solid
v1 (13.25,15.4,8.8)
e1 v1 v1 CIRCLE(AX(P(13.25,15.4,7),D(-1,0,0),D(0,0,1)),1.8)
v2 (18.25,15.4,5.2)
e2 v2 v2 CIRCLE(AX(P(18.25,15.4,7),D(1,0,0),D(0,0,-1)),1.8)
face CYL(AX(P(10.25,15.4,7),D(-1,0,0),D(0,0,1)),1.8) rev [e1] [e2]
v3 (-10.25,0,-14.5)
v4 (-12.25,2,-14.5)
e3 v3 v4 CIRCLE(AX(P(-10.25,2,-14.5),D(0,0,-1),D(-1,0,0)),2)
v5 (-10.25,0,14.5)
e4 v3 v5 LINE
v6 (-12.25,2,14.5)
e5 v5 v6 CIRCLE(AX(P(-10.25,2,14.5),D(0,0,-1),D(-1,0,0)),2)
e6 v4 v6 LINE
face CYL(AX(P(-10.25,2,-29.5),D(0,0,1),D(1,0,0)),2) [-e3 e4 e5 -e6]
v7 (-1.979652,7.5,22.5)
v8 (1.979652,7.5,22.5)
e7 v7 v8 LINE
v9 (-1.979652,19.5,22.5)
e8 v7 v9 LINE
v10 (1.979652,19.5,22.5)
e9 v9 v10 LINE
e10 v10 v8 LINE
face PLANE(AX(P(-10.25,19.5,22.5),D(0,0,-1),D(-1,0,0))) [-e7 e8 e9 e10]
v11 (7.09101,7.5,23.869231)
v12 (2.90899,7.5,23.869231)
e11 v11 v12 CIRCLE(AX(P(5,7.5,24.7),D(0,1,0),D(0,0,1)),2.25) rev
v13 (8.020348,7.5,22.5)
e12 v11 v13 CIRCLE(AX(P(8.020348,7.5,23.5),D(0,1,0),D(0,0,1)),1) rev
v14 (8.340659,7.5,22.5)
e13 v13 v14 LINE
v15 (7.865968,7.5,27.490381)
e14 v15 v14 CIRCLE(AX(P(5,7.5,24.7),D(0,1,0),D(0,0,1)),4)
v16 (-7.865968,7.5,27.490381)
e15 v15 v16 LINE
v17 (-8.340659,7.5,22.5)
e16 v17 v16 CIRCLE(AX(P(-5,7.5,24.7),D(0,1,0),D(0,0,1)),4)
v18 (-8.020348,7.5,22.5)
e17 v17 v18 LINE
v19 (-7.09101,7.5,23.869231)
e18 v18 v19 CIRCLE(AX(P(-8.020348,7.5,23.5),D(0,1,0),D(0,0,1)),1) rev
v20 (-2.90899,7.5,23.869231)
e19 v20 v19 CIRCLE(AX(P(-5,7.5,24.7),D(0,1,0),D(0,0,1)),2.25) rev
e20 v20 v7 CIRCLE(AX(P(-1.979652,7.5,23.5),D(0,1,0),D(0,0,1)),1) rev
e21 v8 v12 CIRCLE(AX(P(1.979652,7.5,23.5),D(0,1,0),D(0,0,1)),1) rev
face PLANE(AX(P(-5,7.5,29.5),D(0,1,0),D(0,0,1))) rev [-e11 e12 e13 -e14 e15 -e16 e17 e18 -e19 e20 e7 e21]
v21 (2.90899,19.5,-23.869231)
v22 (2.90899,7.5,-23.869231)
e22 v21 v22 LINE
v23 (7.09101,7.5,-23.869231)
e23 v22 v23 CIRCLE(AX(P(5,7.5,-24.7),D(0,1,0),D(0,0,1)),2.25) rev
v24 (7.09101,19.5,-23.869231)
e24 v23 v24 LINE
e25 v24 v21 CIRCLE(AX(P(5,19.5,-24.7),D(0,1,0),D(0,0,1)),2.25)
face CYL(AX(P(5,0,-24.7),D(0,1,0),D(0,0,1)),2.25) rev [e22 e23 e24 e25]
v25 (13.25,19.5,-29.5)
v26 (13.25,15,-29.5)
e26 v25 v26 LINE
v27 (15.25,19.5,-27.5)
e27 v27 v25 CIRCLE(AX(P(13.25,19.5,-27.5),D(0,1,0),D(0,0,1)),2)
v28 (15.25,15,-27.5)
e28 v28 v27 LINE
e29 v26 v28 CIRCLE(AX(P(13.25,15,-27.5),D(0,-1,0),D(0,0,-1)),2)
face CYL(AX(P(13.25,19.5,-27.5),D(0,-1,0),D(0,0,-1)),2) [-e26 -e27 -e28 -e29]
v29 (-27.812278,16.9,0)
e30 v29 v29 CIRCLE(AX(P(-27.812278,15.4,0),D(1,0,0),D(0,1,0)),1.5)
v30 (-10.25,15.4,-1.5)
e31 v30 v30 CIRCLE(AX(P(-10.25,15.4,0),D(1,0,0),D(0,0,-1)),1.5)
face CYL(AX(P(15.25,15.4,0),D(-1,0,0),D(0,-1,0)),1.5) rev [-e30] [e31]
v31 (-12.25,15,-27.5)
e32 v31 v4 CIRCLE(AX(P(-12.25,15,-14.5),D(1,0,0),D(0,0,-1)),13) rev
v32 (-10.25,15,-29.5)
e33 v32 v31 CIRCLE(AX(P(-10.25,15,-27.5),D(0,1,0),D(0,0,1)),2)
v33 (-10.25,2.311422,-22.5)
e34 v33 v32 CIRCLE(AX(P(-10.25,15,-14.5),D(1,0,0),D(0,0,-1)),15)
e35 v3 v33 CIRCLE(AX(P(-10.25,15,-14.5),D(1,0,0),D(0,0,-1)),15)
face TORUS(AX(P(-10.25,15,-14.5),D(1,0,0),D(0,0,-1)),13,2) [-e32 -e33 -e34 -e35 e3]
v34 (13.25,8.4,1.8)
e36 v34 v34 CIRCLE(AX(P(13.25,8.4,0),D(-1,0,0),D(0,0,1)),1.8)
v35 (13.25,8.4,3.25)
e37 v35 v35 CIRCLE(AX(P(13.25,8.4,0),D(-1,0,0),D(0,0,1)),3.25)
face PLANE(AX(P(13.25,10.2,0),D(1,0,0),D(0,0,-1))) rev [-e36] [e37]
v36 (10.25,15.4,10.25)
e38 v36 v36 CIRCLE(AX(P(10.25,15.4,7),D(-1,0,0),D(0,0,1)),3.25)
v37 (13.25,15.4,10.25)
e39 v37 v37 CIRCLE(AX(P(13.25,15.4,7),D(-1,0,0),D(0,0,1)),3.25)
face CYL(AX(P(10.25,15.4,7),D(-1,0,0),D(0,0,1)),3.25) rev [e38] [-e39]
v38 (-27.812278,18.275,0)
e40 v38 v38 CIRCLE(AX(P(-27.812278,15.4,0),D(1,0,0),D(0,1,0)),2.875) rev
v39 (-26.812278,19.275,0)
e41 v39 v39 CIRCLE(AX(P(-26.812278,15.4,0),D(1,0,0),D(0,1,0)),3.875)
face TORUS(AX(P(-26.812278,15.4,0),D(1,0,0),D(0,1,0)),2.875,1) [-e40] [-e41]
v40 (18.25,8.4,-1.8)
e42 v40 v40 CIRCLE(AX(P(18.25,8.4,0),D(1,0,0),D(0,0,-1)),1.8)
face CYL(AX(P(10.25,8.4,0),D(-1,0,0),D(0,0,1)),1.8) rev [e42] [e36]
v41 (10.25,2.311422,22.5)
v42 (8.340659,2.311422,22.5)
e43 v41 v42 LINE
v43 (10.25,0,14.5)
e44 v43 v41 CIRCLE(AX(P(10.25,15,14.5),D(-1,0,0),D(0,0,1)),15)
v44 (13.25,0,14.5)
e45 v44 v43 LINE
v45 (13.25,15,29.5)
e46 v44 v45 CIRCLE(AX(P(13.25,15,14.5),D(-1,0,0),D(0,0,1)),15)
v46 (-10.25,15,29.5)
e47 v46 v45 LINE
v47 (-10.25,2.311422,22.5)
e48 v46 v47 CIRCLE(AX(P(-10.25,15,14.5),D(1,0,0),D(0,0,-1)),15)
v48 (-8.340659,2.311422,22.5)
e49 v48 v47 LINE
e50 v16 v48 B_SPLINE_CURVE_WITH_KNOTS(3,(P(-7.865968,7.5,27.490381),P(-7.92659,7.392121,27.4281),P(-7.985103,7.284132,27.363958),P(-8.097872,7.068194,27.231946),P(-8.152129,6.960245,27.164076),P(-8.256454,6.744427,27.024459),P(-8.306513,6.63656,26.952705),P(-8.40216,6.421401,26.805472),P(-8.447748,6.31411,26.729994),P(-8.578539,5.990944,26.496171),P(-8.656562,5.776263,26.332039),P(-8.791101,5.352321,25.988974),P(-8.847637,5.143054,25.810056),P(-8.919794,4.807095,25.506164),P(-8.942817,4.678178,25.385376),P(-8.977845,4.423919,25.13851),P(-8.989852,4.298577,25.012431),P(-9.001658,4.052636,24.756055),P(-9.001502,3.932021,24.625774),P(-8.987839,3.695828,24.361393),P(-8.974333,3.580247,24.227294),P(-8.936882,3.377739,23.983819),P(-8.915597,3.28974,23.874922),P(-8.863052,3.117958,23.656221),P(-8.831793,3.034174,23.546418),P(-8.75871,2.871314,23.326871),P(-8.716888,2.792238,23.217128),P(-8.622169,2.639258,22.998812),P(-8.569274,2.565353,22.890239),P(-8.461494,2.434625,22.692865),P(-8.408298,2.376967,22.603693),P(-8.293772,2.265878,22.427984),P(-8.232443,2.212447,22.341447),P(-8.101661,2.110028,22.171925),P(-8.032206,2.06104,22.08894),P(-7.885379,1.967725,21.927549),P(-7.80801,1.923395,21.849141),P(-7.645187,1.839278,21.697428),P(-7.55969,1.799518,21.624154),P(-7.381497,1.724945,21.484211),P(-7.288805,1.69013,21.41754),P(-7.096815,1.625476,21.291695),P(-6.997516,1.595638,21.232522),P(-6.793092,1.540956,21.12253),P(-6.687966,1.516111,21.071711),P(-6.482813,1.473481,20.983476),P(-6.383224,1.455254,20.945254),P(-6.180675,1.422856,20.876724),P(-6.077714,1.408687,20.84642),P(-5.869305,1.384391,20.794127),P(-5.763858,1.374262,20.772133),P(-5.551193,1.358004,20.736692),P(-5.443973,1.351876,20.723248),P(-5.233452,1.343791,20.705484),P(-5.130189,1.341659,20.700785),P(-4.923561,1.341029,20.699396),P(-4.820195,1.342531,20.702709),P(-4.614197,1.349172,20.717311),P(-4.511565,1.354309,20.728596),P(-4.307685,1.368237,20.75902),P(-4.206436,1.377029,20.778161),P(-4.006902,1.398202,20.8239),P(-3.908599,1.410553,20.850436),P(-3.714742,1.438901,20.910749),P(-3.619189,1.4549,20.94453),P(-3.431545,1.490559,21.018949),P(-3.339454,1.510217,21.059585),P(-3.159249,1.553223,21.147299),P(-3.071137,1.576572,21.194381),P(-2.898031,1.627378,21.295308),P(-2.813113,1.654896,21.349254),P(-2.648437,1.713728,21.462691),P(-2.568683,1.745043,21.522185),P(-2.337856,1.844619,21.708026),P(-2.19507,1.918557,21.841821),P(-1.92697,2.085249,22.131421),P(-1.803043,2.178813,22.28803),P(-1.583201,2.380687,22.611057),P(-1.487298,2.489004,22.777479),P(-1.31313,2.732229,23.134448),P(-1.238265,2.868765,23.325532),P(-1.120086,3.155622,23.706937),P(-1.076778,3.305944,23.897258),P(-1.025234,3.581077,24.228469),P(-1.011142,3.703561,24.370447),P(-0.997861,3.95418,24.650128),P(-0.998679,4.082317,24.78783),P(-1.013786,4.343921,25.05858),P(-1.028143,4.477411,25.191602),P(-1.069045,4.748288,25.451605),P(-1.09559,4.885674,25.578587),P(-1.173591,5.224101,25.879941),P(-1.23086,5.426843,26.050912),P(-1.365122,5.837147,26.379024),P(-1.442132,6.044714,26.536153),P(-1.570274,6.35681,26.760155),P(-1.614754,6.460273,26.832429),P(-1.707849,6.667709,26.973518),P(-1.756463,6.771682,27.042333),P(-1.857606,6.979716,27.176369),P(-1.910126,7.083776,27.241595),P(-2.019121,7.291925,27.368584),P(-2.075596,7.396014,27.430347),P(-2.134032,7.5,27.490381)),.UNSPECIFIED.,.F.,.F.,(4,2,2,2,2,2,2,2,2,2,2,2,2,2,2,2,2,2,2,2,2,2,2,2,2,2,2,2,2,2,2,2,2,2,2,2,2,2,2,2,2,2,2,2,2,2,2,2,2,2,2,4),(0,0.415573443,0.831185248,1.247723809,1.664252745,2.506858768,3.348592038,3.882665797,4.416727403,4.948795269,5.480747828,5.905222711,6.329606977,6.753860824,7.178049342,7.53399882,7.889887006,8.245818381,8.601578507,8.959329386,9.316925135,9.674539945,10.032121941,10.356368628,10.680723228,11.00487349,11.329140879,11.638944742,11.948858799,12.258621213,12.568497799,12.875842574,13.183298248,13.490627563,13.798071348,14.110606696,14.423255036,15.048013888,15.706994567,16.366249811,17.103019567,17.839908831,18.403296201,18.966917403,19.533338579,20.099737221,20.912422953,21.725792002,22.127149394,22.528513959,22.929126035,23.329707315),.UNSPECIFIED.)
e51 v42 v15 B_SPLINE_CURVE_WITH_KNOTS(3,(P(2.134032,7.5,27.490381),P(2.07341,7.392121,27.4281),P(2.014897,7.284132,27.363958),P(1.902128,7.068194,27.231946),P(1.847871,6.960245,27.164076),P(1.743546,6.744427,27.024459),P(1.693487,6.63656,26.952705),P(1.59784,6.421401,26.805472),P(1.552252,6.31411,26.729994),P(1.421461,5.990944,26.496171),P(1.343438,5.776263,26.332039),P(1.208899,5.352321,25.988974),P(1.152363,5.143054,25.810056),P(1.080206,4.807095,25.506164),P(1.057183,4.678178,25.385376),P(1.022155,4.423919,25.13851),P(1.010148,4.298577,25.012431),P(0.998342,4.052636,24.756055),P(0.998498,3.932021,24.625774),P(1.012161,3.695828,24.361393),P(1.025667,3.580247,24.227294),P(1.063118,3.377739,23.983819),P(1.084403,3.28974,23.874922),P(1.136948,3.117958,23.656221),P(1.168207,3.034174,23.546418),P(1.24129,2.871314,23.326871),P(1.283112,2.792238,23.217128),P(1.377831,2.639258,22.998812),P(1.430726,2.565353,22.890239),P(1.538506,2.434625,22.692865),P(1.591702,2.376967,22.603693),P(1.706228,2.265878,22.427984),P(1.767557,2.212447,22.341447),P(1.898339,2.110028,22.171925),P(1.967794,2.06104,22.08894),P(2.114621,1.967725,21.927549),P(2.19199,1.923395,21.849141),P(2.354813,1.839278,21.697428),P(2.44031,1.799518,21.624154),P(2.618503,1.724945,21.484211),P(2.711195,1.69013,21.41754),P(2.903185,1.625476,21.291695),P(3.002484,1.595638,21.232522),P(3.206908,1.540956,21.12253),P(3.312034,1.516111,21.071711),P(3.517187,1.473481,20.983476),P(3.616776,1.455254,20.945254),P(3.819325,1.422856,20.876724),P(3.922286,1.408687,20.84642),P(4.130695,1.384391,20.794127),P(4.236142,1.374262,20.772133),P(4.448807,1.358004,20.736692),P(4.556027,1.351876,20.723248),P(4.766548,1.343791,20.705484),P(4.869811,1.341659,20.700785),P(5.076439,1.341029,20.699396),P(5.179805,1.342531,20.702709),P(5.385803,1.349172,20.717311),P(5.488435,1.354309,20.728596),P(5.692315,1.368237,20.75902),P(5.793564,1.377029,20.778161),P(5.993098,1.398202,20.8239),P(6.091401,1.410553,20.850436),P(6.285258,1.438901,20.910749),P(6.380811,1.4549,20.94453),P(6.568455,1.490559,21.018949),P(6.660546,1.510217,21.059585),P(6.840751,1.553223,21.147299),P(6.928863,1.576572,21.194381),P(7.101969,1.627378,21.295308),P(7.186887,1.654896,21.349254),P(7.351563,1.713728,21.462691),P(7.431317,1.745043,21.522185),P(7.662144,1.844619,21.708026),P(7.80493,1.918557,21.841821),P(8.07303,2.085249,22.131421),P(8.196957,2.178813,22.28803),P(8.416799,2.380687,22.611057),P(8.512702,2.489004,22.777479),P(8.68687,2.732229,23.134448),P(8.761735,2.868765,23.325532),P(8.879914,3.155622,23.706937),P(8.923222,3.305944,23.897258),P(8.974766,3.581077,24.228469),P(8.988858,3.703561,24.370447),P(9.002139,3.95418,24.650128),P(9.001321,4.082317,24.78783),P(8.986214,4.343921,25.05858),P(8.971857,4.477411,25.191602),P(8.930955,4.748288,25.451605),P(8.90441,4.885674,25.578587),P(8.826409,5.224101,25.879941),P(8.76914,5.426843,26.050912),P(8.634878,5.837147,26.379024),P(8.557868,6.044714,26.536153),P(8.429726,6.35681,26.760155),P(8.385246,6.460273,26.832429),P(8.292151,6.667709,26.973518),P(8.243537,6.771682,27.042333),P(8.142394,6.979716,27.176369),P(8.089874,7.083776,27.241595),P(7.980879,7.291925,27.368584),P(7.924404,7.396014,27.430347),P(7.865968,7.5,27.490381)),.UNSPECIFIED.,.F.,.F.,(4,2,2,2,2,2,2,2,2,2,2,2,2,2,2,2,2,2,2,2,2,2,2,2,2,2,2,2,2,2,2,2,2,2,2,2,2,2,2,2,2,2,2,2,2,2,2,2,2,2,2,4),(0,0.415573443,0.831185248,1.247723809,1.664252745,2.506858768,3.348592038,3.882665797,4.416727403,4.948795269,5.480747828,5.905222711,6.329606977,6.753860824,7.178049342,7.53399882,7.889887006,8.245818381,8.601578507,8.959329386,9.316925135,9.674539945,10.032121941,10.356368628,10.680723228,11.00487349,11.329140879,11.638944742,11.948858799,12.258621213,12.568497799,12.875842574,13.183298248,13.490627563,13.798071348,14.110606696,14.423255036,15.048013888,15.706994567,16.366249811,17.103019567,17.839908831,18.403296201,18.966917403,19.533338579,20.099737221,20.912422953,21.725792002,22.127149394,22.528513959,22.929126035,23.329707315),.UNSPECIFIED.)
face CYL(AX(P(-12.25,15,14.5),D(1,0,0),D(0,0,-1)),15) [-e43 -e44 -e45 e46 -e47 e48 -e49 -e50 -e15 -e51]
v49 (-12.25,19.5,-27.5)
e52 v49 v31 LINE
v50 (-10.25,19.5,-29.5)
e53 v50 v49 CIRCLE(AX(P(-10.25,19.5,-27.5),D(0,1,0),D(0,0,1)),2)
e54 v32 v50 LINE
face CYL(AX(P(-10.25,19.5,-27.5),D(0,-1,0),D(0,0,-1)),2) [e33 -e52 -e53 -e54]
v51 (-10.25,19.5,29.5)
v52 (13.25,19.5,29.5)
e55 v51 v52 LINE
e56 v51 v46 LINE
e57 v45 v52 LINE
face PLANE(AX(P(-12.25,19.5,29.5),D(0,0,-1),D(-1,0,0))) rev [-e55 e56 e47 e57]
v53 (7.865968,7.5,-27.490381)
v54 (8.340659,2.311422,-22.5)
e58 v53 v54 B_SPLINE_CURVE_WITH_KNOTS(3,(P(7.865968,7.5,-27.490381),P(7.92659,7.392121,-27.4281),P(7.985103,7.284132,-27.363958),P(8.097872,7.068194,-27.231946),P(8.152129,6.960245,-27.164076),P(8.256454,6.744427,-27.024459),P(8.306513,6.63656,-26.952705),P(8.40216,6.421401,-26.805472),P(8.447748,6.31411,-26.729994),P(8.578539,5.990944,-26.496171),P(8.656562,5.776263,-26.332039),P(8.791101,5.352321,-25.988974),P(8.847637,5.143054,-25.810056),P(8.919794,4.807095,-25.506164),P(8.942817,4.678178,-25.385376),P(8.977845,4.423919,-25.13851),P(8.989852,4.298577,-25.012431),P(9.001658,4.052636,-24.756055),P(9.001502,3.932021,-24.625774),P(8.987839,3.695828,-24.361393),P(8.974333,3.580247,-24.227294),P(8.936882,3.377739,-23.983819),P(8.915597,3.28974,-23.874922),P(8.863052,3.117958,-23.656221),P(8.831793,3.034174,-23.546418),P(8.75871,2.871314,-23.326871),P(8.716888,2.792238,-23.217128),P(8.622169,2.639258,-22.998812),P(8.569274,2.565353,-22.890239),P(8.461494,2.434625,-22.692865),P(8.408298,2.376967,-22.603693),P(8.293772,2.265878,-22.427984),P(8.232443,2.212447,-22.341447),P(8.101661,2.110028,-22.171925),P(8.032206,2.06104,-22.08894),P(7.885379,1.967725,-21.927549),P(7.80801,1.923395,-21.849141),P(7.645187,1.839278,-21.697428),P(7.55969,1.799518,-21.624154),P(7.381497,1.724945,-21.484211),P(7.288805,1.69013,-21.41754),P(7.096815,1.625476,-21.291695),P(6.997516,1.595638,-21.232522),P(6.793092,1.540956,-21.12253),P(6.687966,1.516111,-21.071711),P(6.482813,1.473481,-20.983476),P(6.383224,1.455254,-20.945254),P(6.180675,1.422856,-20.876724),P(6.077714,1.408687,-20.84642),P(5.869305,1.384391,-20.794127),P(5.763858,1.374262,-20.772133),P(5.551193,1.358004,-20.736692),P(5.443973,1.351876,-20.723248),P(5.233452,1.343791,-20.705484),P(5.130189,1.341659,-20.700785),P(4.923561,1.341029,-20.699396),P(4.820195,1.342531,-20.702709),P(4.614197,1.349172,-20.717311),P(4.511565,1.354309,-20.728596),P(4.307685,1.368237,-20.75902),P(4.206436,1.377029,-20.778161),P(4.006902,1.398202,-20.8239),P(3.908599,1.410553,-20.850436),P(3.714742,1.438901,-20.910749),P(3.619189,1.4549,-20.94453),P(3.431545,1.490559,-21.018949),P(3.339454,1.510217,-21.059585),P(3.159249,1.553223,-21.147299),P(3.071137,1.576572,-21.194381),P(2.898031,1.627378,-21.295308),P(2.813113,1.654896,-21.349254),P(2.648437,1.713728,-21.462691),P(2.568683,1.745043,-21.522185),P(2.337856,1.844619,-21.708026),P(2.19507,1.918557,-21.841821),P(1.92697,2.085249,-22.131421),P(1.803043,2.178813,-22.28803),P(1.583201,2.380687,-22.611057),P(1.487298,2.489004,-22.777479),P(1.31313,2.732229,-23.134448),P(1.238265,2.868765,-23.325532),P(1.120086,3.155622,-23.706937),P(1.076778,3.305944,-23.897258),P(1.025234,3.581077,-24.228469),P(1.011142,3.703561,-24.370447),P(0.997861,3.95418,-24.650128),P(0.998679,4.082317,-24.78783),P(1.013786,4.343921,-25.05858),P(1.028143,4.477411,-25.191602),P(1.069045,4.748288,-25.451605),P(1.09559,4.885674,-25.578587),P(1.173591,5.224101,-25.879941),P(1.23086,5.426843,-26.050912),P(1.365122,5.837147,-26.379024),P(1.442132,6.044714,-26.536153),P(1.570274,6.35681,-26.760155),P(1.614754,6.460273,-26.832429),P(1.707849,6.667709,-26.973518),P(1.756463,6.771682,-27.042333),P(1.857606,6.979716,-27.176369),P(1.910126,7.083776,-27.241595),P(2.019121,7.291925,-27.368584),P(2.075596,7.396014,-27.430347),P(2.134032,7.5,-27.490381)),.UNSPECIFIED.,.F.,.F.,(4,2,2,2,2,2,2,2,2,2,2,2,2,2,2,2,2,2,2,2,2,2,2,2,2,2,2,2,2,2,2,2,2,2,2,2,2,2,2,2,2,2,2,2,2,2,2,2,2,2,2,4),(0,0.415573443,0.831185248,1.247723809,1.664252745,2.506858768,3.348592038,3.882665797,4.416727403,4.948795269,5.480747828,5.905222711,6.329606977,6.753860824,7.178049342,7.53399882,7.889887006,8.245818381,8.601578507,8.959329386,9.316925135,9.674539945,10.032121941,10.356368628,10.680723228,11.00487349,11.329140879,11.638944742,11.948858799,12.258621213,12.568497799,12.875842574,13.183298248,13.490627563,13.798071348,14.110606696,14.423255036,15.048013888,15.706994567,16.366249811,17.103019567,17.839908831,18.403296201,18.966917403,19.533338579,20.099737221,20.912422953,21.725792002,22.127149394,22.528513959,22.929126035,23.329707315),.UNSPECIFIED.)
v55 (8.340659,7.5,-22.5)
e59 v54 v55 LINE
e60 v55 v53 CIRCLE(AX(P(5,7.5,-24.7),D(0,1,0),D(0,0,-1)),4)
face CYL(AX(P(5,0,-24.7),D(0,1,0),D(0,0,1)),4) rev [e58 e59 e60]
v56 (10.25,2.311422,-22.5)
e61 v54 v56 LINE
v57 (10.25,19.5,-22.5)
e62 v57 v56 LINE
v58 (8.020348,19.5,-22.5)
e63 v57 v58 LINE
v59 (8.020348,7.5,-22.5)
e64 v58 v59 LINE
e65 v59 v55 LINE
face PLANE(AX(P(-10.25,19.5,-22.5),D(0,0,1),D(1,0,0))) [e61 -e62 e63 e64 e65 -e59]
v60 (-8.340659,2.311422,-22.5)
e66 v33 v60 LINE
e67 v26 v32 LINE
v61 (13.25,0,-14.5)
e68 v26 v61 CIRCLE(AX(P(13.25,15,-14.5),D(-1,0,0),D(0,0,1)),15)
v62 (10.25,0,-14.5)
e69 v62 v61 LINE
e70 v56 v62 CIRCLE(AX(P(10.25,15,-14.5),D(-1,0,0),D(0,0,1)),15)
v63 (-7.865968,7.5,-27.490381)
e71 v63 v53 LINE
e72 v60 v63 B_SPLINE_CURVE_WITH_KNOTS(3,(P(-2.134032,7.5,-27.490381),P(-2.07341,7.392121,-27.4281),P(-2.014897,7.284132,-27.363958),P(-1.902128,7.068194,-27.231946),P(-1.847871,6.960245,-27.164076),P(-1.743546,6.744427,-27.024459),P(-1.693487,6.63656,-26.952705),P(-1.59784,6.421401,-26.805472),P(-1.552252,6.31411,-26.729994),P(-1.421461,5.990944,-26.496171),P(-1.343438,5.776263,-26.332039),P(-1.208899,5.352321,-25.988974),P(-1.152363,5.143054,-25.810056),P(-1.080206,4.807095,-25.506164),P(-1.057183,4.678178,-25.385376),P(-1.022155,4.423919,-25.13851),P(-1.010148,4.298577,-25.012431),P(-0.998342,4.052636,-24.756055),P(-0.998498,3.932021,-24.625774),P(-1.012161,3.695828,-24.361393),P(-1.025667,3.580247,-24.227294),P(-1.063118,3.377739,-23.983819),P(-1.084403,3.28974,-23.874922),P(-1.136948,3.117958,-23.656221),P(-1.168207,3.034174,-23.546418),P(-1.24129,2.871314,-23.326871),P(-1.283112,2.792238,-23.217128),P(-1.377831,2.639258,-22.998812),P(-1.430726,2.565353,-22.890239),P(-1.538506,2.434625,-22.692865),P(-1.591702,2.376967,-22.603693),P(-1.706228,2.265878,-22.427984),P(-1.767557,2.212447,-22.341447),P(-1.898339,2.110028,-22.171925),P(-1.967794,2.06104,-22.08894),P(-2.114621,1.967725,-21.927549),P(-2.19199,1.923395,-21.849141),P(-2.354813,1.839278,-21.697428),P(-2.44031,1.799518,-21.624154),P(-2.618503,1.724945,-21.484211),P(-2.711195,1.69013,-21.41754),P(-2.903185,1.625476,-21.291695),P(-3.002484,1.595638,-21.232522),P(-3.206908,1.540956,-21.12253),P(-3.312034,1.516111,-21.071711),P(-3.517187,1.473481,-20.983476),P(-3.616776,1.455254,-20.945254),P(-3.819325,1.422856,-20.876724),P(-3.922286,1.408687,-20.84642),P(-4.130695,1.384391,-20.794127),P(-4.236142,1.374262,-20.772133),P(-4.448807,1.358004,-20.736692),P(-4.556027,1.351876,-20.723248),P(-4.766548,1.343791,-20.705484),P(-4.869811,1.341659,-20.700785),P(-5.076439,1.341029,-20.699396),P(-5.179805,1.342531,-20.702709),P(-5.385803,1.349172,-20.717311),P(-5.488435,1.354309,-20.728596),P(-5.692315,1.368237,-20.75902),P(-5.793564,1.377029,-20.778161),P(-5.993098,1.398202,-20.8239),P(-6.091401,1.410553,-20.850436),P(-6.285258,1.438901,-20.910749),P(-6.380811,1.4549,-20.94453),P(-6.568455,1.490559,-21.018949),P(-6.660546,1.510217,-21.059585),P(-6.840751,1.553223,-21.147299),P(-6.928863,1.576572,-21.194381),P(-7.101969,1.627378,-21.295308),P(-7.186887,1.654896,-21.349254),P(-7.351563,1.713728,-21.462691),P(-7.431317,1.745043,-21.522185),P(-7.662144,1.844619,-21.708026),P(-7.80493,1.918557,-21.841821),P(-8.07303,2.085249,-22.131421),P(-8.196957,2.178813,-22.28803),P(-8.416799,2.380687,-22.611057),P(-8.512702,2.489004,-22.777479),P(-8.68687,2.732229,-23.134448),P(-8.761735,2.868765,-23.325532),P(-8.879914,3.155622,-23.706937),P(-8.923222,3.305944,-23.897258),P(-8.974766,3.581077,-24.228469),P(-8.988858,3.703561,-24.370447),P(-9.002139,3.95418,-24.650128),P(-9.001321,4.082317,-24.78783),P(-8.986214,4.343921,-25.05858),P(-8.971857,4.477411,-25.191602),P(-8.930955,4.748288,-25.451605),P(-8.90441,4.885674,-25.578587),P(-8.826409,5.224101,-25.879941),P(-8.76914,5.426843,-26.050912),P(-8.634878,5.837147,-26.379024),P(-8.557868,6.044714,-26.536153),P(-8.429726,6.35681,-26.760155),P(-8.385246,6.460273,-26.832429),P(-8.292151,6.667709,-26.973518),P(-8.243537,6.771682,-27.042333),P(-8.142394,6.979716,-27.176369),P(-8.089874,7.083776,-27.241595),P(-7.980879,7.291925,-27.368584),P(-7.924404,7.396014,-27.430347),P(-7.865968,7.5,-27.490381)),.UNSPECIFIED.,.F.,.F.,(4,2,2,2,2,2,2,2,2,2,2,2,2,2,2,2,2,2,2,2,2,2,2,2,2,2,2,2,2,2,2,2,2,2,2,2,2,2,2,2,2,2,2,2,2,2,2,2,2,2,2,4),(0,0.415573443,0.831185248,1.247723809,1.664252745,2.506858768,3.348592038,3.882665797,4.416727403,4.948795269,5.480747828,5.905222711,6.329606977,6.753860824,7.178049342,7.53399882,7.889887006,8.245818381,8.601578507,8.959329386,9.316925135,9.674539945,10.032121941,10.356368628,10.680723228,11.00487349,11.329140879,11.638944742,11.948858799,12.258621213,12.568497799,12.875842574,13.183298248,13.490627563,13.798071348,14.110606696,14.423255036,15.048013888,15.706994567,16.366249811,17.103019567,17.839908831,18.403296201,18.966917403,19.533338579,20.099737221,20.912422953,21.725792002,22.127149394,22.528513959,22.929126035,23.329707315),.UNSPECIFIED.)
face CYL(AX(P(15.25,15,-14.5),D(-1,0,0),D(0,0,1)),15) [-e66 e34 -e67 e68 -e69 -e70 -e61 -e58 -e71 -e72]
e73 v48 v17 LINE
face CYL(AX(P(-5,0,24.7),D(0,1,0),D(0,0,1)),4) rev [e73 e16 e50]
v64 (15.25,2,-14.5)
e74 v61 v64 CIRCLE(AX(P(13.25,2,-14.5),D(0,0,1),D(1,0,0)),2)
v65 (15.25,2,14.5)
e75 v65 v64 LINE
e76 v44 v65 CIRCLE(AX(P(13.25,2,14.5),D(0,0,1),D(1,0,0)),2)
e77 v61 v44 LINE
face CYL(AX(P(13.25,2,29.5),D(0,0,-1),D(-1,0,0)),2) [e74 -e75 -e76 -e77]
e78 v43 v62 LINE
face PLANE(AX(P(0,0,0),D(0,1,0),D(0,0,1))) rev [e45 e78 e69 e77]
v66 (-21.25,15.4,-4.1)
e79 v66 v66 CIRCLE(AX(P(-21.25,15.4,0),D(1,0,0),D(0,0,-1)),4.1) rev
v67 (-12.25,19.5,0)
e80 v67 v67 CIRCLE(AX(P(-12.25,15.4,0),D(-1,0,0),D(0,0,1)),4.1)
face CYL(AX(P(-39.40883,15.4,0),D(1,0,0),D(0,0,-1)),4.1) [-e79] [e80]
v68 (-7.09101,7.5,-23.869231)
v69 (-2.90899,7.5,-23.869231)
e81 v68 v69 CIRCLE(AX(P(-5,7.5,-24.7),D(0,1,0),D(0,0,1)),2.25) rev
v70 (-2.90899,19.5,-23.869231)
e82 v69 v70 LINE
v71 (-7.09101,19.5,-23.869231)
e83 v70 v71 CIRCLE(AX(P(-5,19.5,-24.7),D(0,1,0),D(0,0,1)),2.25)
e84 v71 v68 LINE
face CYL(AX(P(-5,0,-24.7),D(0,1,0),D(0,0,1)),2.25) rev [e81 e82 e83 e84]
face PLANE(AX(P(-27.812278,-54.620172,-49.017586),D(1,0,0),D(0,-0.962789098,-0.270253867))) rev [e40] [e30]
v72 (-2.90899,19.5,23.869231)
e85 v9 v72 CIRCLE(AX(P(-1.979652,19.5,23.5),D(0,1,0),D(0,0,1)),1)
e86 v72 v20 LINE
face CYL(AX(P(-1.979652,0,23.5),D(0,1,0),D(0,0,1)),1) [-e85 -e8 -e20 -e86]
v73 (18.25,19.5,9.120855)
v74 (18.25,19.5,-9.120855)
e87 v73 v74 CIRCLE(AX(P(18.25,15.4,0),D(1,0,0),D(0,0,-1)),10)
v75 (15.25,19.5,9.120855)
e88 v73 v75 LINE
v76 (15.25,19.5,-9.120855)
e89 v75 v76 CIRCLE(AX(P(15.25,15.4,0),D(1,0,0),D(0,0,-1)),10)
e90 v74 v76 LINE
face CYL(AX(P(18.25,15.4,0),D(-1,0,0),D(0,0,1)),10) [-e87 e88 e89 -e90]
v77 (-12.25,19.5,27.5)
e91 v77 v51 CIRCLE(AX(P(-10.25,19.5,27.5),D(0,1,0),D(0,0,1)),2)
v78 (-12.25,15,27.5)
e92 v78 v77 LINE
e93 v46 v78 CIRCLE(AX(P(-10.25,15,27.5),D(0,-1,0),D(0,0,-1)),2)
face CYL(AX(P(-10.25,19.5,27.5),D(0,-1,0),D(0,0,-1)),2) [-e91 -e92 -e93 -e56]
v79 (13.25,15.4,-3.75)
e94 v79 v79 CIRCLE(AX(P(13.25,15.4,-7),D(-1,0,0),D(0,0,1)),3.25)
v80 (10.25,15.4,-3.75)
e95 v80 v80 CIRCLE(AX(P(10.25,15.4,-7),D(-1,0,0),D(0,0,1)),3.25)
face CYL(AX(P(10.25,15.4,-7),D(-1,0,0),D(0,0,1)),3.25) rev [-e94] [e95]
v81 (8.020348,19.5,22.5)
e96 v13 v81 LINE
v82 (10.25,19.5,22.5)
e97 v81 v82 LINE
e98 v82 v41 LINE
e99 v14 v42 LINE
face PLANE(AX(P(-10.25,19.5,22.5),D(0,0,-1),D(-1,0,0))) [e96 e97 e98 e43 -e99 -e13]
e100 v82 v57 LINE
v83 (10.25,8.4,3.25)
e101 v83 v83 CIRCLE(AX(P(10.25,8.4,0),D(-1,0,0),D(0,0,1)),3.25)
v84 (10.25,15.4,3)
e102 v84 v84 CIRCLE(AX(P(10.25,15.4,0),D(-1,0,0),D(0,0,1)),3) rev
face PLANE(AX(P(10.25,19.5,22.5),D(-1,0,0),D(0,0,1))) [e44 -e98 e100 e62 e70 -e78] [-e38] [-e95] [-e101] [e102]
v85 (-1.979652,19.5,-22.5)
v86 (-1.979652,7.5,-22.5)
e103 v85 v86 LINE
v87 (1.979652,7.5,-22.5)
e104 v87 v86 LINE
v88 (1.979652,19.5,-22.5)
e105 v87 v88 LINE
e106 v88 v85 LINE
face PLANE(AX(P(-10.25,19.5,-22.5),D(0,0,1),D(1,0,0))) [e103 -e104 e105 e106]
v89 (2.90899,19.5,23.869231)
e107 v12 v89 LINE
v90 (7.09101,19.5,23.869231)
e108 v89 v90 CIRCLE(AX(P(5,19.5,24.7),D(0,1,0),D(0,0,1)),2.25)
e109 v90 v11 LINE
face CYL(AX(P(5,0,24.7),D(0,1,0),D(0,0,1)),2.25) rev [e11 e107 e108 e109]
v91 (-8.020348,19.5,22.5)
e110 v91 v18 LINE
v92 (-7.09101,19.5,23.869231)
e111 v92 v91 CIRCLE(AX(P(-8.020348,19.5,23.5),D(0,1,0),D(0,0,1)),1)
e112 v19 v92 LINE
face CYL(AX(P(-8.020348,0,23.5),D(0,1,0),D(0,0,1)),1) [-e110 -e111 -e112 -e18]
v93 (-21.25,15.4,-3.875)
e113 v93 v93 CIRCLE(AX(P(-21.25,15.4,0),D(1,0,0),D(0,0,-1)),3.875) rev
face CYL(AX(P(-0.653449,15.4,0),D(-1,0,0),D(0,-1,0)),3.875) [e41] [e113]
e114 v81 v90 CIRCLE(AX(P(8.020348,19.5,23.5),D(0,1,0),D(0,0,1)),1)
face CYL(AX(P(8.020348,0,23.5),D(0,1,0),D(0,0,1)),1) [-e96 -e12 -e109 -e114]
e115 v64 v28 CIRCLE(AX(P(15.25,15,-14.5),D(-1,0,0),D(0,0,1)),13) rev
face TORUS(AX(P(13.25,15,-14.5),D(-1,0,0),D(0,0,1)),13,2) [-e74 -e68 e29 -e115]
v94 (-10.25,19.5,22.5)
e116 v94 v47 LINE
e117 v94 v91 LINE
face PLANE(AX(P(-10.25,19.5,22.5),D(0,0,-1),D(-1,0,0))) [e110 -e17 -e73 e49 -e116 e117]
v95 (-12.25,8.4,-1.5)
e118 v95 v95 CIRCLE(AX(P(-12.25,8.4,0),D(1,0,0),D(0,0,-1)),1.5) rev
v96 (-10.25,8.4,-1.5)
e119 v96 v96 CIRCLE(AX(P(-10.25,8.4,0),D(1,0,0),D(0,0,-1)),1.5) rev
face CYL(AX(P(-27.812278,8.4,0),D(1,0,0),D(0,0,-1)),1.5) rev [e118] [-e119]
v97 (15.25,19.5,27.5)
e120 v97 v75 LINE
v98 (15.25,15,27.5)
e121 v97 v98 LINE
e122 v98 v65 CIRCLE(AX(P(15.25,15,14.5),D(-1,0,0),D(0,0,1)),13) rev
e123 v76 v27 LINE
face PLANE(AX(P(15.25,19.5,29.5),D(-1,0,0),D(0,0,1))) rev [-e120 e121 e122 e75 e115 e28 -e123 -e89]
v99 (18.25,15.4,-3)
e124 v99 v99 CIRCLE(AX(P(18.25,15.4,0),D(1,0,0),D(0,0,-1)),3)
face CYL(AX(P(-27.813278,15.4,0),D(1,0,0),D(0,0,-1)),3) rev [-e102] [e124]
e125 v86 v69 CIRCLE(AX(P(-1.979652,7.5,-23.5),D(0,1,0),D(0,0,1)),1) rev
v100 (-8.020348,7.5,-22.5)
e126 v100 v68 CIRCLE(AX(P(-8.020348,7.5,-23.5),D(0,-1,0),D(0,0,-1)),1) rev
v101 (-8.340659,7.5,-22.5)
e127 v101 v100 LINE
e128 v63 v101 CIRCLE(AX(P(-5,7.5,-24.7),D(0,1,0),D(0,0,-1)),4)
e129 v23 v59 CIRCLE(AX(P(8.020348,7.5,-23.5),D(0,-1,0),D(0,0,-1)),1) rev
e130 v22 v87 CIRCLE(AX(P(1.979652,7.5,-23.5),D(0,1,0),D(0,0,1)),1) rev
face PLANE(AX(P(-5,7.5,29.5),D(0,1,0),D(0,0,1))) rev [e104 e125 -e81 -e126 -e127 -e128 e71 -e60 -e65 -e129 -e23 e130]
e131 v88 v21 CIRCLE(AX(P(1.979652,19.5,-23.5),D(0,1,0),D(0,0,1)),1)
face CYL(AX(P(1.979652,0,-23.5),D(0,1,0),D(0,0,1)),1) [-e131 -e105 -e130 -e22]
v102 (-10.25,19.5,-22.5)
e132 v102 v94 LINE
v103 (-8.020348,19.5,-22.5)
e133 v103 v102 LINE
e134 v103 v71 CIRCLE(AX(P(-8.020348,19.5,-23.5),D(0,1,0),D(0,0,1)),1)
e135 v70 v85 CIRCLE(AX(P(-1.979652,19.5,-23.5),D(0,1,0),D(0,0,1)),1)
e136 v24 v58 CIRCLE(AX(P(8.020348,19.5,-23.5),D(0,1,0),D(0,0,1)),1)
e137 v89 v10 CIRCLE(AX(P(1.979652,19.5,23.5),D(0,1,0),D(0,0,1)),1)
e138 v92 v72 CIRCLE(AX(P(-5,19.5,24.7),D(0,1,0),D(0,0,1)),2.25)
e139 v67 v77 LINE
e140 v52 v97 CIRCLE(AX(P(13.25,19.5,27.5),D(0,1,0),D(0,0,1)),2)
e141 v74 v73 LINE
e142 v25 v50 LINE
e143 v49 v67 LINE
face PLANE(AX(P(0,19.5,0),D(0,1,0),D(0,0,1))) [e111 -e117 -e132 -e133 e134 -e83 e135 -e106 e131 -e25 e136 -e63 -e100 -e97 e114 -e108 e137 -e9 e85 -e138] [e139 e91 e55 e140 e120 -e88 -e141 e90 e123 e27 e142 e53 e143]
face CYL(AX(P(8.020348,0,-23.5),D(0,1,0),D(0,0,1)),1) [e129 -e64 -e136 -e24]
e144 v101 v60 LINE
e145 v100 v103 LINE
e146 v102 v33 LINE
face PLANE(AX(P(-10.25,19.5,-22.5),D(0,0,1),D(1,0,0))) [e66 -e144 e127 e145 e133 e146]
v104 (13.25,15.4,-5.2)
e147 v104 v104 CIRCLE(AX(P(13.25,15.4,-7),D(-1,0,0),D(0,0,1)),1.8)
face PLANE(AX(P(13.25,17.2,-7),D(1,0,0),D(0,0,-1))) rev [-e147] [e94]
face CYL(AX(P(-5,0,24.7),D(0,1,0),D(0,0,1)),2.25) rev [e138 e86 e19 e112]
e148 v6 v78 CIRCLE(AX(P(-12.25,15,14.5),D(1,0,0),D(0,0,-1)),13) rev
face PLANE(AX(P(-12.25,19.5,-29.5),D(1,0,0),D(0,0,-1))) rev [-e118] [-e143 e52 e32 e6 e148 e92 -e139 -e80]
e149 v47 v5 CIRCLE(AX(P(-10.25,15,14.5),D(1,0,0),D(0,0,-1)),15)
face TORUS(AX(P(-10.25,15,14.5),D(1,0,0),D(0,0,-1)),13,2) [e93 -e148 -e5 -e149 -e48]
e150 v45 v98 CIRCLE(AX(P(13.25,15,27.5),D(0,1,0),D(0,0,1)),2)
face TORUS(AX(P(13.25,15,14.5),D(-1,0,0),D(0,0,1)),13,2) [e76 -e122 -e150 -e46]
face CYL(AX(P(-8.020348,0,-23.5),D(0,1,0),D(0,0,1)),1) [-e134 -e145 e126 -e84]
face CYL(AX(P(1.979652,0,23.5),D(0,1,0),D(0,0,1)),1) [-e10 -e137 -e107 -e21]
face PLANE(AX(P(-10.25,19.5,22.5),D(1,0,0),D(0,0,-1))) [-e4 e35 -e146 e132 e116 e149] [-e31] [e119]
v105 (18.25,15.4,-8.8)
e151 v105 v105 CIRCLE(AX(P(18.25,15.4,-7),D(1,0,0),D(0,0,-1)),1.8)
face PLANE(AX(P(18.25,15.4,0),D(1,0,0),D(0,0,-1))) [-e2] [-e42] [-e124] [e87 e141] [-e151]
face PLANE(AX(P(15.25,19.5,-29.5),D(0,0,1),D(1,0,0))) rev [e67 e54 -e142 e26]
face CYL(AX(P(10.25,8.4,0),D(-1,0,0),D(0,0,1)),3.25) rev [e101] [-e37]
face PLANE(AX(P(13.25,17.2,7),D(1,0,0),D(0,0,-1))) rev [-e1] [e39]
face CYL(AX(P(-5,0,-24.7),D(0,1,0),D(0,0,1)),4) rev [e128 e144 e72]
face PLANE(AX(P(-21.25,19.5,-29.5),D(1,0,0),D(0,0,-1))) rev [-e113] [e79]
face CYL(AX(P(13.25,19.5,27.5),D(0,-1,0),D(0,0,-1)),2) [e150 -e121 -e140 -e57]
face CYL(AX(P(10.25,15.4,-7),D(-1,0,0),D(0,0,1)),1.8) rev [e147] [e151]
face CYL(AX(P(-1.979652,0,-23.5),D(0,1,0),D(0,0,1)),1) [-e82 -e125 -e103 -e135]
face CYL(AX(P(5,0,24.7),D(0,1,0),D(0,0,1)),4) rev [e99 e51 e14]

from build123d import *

# Parameters (mm, degrees)
SKETCH1_W                      = 27.5
SKETCH1_H                      = 59
SKETCH1_W_2                    = 20.5
SKETCH1_H_2                    = 45
BOSS_EXTRUDE1_DEPTH            = 19.5
CUT_EXTRUDE1_DEPTH             = 39.510550502
CUT_EXTRUDE1_DEPTH_BACK        = 39.510550502
SKETCH2_R                      = 2.25
FILLET1_R                      = 1
SKETCH4_R                      = 4.1
BOSS_EXTRUDE2_DEPTH            = 15.562278481
CBORE_FOR_M3_SHCS1_D           = 3.6
CBORE_FOR_M3_SHCS1_DEPTH       = 5
CBORE_FOR_M3_SHCS1_CBORE_D     = 6.5
CBORE_FOR_M3_SHCS1_CBORE_DEPTH = 3
CUT_EXTRUDE3_REACH             = 57.721
SKETCH5_R                      = 3
CUT_EXTRUDE11_START            = -6.562278481
SKETCH18_R                     = 4.1
SKETCH18_R_2                   = 3.875
CUT_EXTRUDE11_DEPTH            = 6.562278481
CUT_EXTRUDE12_DEPTH            = 56.721269081
CUT_EXTRUDE12_DEPTH_BACK       = 56.721269081
SKETCH20_R                     = 1.5
FILLET10_R                     = 1
CUT_EXTRUDE13_DEPTH            = 69.079165975
CUT_EXTRUDE13_DEPTH_BACK       = 69.079165975
SKETCH21_W                     = 10
SKETCH21_H                     = 15
FILLET8_R                      = 15
CUT_EXTRUDE2_START             = -12
SKETCH3_R                      = 4
CUT_EXTRUDE2_DEPTH             = 33.989141464
FILLET11_R                     = 2
BOSS_EXTRUDE3_START            = 3
SKETCH22_R                     = 1.8
SKETCH22_R_2                   = 3
BOSS_EXTRUDE3_DEPTH            = 3
SKETCH23_R                     = 1.5
CUT_EXTRUDE14_DEPTH            = 52.954182283


# Some blends are built 0.0001 mm under size
with BuildPart() as part:
    # Sketch1 → Boss-Extrude1 (new body)
    with BuildSketch(Plane(origin=(0, 0, 0), x_dir=(1, 0, 0), z_dir=(0, 1, 0))):
        with Locations((1.5, 0)):
            Rectangle(SKETCH1_W, SKETCH1_H)
        Rectangle(SKETCH1_W_2, SKETCH1_H_2, mode=Mode.SUBTRACT)
    extrude(amount=BOSS_EXTRUDE1_DEPTH)

    # Sketch2 → Cut-Extrude1 (cut, two sides: drawn at the far end of the back side and taken through both)
    with BuildSketch(Plane(origin=(0, 19.5, 0), x_dir=(1, 0, 0), z_dir=(0, 1, 0)).offset(-CUT_EXTRUDE1_DEPTH_BACK)):
        with Locations((-5, 24.7)):
            Circle(SKETCH2_R)
        with Locations((5, 24.7)):
            Circle(SKETCH2_R)
        with Locations((5, -24.7)):
            Circle(SKETCH2_R)
        with Locations((-5, -24.7)):
            Circle(SKETCH2_R)
    extrude(amount=CUT_EXTRUDE1_DEPTH + CUT_EXTRUDE1_DEPTH_BACK, mode=Mode.SUBTRACT)

    # Fillet1
    fillet1_edges = [part.edges().sort_by_distance(p)[0] for p in [
        (5.471699057, 9.75, 22.5),
        (4.528300943, 9.75, 22.5),
        (-4.528300943, 9.75, 22.5),
        (-5.471699057, 9.75, 22.5),
        (-5.471699057, 9.75, -22.5),
        (-4.528300943, 9.75, -22.5),
        (4.528300943, 9.75, -22.5),
        (5.471699057, 9.75, -22.5),
    ]]
    fillet(fillet1_edges, radius=FILLET1_R)

    # Sketch4 → Boss-Extrude2 (add)
    with BuildSketch(Plane.ZY.offset(12.25)):
        with Locations(Location((0, 15.4, 0), (0, 0, 90))):
            Circle(SKETCH4_R)
    extrude(amount=BOSS_EXTRUDE2_DEPTH)

    # CBORE for M3 SHCS1
    with Locations(Plane.ZY.offset(-10.25)):
        with Locations((-7, 15.4), (7, 15.4), (0, 8.4)):
            CounterBoreHole(CBORE_FOR_M3_SHCS1_D / 2, CBORE_FOR_M3_SHCS1_CBORE_D / 2, CBORE_FOR_M3_SHCS1_CBORE_DEPTH, depth=CBORE_FOR_M3_SHCS1_DEPTH)

    # Sketch5 → Cut-Extrude3 (cut, up to next)
    with BuildSketch(Plane(origin=(15.25, 0, 0), x_dir=(0, 0, -1), z_dir=(1, 0, 0)), mode=Mode.PRIVATE) as cut_extrude3_sk1:
        with Locations((0, 15.4)):
            Circle(SKETCH5_R)
    cut_extrude3_tool1 = extrude(cut_extrude3_sk1.sketch, amount=-CUT_EXTRUDE3_REACH, mode=Mode.PRIVATE) & part.part
    add(cut_extrude3_tool1.solids().sort_by_distance((15.25, 15.4, 0))[0], mode=Mode.SUBTRACT)

    # Sketch18 → Cut-Extrude11 (cut)
    with BuildSketch(Plane.ZY.offset(27.812278481).offset(CUT_EXTRUDE11_START)):
        with Locations(Location((0, 15.4, 0), (0, 0, 180))):
            Circle(SKETCH18_R)
        with Locations(Location((0, 15.4, 0), (0, 0, 270))):
            Circle(SKETCH18_R_2, mode=Mode.SUBTRACT)
    extrude(amount=CUT_EXTRUDE11_DEPTH, mode=Mode.SUBTRACT)

    # Sketch20 → Cut-Extrude12 (cut, two sides: drawn at the far end of the back side and taken through both)
    with BuildSketch(Plane.ZY.offset(27.812278481).offset(-CUT_EXTRUDE12_DEPTH_BACK)):
        with Locations(Location((0, 15.4, 0), (0, 0, 180))):
            Circle(SKETCH20_R)
    extrude(amount=CUT_EXTRUDE12_DEPTH + CUT_EXTRUDE12_DEPTH_BACK, mode=Mode.SUBTRACT)

    # Fillet10
    fillet10_edges = [part.edges().sort_by_distance(p)[0] for p in [
        (-27.812278481, 19.275, 0),
    ]]
    fillet(fillet10_edges, radius=FILLET10_R)

    # Sketch21 → Cut-Extrude13 (cut, two sides: drawn at the far end of the back side and taken through both)
    with BuildSketch(Plane(origin=(0, 0, -29.5), x_dir=(-1, 0, 0), z_dir=(0, 0, -1)).offset(-CUT_EXTRUDE13_DEPTH_BACK)):
        Rectangle(SKETCH21_W, SKETCH21_H)
    extrude(amount=CUT_EXTRUDE13_DEPTH + CUT_EXTRUDE13_DEPTH_BACK, mode=Mode.SUBTRACT)

    # Fillet8
    # the kernel refuses this fillet: 15 mm, written as the material it takes off along each edge
    with BuildSketch(Plane(origin=(-49.75, 0, 29.5), x_dir=(0, 0, -1), z_dir=(1, 0, 0)), Plane(origin=(32.5, 0, -29.5), x_dir=(0, 0, 1), z_dir=(-1, 0, 0))) as fillet8_piece_1:
        with BuildLine():
            CenterArc((FILLET8_R, FILLET8_R), FILLET8_R, 180, 90)
            Line((0, FILLET8_R), (0, 0))
            Line((0, 0), (FILLET8_R, 0))
        make_face()
    extrude(amount=82.25, mode=Mode.SUBTRACT)
    with BuildSketch(Plane(origin=(-32.5, 0, 29.5), x_dir=(0, 1, 0), z_dir=(1, 0, 0)), Plane(origin=(52.75, 0, -29.5), x_dir=(0, 1, 0), z_dir=(-1, 0, 0))) as fillet8_piece_2:
        with BuildLine():
            CenterArc((FILLET8_R, -FILLET8_R), FILLET8_R, 90, 90)
            Line((0, -FILLET8_R), (0, 0))
            Line((0, 0), (FILLET8_R, 0))
        make_face()
    extrude(amount=85.25, mode=Mode.SUBTRACT)

    # Sketch3 → Cut-Extrude2 (cut, through all)
    with BuildSketch(Plane(origin=(0, 19.5, 0), x_dir=(1, 0, 0), z_dir=(0, 1, 0)).offset(CUT_EXTRUDE2_START)):
        with Locations((-5, -24.7)):
            Circle(SKETCH3_R)
        with Locations((5, -24.7)):
            Circle(SKETCH3_R)
        with Locations((5, 24.7)):
            Circle(SKETCH3_R)
        with Locations((-5, 24.7)):
            Circle(SKETCH3_R)
    extrude(amount=-CUT_EXTRUDE2_DEPTH, mode=Mode.SUBTRACT)

    # Fillet11
    fillet11_edges = [part.edges().sort_by_distance(p)[0] for p in [
        (-12.25, 0, 0),
        (-12.25, 4.393398282, 25.106601718),
        (-12.25, 4.393398282, -25.106601718),
        (15.25, 0, 0),
        (15.25, 4.393398282, -25.106601718),
        (15.25, 4.393398282, 25.106601718),
        (15.25, 17.25, 29.5),
        (-12.25, 17.25, 29.5),
        (-12.25, 17.25, -29.5),
        (15.25, 17.25, -29.5),
    ]]
    fillet(fillet11_edges, radius=FILLET11_R - 0.0001)  # a hair under: the kernel refuses the full size

    # Sketch22 → Boss-Extrude3 (add)
    with BuildSketch(Plane(origin=(15.25, 0, 0), x_dir=(0, 0, -1), z_dir=(1, 0, 0)).offset(BOSS_EXTRUDE3_START)):
        with BuildLine():
            Line((9.120855223, 19.5), (-9.120855223, 19.5))
            ThreePointArc((-9.120855223, 19.5), (0, 5.4), (9.120855223, 19.5))
        make_face()
        with Locations(Location((7, 15.4, 0), (0, 0, 180))):
            Circle(SKETCH22_R, mode=Mode.SUBTRACT)
        with Locations(Location((0, 8.4, 0), (0, 0, 180))):
            Circle(SKETCH22_R, mode=Mode.SUBTRACT)
        with Locations((0, 15.4)):
            Circle(SKETCH22_R_2, mode=Mode.SUBTRACT)
        with Locations(Location((-7, 15.4, 0), (0, 0, 180))):
            Circle(SKETCH22_R, mode=Mode.SUBTRACT)
    extrude(amount=-BOSS_EXTRUDE3_DEPTH)

    # Sketch23 → Cut-Extrude14 (cut, through all)
    with BuildSketch(Plane.ZY.offset(-10.25)):
        with Locations(Location((0, 8.4, 0), (0, 0, 180))):
            Circle(SKETCH23_R)
    extrude(amount=CUT_EXTRUDE14_DEPTH, mode=Mode.SUBTRACT)


solid = part.part
